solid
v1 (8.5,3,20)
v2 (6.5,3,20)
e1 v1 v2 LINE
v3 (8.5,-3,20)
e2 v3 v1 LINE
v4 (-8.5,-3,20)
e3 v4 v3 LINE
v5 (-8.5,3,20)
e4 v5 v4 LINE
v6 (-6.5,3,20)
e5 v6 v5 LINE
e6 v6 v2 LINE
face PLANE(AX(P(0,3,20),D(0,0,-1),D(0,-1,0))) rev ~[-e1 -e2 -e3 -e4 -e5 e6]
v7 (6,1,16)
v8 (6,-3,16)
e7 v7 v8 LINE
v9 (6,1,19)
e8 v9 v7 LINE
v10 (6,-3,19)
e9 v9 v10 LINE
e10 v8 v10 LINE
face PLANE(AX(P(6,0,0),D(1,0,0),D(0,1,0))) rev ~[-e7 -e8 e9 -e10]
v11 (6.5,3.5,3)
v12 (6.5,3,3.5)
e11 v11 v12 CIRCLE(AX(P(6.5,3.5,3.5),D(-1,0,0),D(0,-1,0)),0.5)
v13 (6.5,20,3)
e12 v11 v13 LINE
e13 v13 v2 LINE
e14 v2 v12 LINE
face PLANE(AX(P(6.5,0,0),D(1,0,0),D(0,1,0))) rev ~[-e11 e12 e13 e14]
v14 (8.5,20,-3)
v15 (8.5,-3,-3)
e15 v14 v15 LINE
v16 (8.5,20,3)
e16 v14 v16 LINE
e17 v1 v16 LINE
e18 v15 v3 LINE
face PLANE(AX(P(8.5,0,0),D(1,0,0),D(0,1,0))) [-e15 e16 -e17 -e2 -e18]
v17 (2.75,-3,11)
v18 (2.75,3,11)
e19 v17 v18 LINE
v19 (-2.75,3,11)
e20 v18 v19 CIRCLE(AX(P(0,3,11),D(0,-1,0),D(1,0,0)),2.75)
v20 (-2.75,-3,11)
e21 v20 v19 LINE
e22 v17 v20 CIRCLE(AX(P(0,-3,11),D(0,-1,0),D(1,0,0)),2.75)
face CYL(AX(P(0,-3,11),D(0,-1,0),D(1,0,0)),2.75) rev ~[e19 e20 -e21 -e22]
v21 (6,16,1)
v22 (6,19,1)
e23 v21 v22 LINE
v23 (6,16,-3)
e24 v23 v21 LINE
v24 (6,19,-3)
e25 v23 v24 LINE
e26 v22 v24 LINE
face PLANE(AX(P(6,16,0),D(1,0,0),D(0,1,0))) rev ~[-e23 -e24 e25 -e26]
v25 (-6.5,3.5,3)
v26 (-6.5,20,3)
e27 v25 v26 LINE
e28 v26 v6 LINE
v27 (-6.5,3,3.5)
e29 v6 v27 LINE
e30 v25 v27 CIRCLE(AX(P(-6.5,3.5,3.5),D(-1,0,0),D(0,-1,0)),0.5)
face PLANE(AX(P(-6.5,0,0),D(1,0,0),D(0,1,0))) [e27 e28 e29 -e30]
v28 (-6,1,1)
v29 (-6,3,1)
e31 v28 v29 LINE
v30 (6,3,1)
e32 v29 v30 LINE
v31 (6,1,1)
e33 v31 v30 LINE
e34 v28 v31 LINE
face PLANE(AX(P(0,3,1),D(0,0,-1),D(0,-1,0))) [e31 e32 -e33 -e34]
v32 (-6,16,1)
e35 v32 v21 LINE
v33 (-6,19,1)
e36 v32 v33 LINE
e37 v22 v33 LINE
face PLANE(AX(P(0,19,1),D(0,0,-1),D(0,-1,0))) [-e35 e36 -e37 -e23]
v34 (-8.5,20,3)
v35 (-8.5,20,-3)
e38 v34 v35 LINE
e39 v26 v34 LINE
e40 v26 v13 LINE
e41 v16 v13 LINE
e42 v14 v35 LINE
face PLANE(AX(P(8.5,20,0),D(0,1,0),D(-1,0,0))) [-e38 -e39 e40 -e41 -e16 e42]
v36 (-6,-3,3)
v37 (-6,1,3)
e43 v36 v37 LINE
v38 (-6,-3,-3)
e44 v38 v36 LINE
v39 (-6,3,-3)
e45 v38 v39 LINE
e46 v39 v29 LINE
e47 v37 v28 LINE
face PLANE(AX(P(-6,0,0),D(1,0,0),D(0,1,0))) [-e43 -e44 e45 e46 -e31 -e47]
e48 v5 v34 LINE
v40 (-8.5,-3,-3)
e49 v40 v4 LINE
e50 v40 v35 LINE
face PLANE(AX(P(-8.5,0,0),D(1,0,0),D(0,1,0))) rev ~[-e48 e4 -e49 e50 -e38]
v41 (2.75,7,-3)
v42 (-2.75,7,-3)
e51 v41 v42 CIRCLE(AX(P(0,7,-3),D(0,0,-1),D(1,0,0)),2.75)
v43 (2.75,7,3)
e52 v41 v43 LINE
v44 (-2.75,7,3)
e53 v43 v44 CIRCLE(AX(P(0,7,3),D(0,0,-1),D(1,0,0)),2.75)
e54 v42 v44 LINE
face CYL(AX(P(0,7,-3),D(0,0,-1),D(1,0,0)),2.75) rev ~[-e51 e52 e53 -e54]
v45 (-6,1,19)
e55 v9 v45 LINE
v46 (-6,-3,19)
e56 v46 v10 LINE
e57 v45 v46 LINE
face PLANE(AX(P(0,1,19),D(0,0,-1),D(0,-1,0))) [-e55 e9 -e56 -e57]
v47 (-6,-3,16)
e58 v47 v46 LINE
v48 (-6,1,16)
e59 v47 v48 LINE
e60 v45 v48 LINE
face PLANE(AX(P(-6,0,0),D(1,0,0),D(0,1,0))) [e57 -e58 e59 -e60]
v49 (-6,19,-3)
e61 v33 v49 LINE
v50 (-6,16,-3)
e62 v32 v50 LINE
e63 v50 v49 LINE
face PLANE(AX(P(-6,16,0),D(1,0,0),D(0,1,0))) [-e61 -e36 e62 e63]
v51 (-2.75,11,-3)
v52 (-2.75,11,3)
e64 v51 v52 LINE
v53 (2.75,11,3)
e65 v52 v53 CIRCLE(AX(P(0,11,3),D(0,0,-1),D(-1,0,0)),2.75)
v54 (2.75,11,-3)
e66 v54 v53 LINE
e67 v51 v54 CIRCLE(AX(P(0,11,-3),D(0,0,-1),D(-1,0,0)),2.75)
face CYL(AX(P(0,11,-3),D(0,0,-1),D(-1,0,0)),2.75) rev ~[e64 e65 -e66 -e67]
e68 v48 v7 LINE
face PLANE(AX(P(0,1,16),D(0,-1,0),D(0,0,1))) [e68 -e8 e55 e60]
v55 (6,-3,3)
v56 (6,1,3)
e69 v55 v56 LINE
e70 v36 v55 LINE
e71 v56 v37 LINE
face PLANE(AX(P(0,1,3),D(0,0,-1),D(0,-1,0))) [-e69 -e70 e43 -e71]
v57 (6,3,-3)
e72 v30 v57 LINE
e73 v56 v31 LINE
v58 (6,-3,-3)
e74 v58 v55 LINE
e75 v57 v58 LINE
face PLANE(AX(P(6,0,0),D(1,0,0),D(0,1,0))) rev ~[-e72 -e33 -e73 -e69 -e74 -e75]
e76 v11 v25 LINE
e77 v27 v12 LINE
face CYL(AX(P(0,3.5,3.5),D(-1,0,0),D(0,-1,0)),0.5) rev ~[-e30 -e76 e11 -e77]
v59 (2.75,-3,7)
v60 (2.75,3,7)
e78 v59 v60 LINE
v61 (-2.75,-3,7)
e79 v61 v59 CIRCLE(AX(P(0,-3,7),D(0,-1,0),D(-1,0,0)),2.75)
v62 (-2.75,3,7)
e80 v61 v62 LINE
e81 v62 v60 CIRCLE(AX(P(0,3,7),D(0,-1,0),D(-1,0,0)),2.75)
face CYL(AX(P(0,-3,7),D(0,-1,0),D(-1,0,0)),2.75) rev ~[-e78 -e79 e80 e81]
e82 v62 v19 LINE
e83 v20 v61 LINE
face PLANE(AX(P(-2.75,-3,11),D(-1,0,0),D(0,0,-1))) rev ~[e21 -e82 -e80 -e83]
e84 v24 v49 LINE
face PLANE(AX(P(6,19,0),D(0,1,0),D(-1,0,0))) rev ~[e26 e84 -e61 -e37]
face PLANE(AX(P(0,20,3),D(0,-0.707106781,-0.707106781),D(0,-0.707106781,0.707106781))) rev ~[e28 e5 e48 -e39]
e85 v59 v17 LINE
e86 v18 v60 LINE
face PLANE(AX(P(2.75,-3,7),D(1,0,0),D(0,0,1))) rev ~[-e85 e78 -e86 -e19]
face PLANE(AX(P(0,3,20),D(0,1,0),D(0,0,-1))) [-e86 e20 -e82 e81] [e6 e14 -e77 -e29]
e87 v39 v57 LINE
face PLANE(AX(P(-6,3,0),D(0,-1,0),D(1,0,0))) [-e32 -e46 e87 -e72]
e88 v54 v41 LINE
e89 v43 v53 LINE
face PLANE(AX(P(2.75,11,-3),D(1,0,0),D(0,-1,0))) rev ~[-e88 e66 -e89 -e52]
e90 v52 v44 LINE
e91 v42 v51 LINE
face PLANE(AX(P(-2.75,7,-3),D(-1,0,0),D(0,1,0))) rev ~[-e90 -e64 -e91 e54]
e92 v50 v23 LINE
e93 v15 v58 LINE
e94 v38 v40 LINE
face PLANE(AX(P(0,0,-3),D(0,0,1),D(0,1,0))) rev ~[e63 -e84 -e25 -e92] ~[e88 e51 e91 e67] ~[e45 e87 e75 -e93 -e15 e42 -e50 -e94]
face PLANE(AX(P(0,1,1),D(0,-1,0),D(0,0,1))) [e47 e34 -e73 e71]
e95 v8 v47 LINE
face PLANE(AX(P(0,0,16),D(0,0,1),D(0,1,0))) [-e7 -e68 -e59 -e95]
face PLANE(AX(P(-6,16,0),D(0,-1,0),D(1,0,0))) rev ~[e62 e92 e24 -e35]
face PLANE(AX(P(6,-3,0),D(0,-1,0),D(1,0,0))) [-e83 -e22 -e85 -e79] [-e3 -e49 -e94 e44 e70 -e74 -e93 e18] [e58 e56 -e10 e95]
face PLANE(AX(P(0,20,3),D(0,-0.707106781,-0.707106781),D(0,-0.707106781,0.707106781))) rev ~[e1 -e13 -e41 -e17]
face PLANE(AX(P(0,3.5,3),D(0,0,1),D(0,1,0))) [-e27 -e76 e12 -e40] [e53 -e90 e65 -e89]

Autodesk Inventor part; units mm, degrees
ref_plane "YZ Plane" through (0, 0, 0) normal (1, 0, 0) x (0, 1, 0)
ref_plane "XZ Plane" through (0, 0, 0) normal (0, 1, 0) x (-1, 0, 0)
ref_plane "XY Plane" through (0, 0, 0) normal (0, 0, 1) x (1, 0, 0)
sketch "Sketch_1" plane through (0, 0, 0) normal (1, 0, 0) x (0, 1, 0)
  line L0 (0, 20) -> (0, 0)
  line L1 (0, 0) -> (20, 0)
  line L2 (20, 0) -> (20, 3)
  line L3 (20, 3) -> (3, 20)
  line L4 (3, 20) -> (0, 20)
  dimension "d35" = 20
  dimension "d36" = 20
  dimension "d37" = 17
  dimension "d38" = 3
extrude "Extrusion1" add sketch "Sketch_1" along normal mid plane 17
sketch "Sketch_2" plane through (0, 0, 0) normal (1, 0, 0) x (0, 1, 0)
  line L0 (3, 20) -> (3, 3.5)
  arc A0 (3, 3.5) -> (3.5, 3) centre (3.5, 3.5) ccw
  line L1 (3.5, 3) -> (20, 3)
  line L2 (20, 3) -> (3, 20)
extrude "Extrusion2" cut sketch "Sketch_2" along normal mid plane 13
sketch "Sketch_3" plane through (0, 0, 0) normal (1, 0, 0) x (0, 1, 0)
  line L0 (0, 3) -> (0, 0)
  line L1 (0, 0) -> (3, 0)
  line L2 (3, 0) -> (3, 1)
  line L3 (3, 1) -> (1, 1)
  line L4 (1, 1) -> (1, 3)
  line L5 (1, 3) -> (0, 3)
extrude "Extrusion3" cut sketch "Sketch_3" along normal mid plane 12
sketch "Sketch_4" plane through (0, 0, 0) normal (1, 0, 0) x (0, 1, 0)
  line L0 (0, 19) -> (0, 16)
  line L1 (0, 16) -> (1, 16)
  line L2 (1, 16) -> (1, 19)
  line L3 (1, 19) -> (0, 19)
extrude "Extrusion4" cut sketch "Sketch_4" along normal mid plane 12
sketch "Sketch_5" plane through (0, 0, 0) normal (1, 0, 0) x (0, 1, 0)
  line L0 (16, 1) -> (16, 0)
  line L1 (16, 0) -> (19, 0)
  line L2 (19, 0) -> (19, 1)
  line L3 (19, 1) -> (16, 1)
extrude "Extrusion5" cut sketch "Sketch_5" along normal mid plane 12
move faces "Move1" translate (0, 0, -3) faces at (-2, 7.3333, 0) (-2, 0, 11.6667)
move faces "Move2" translate (0, -3, 0) faces at (-2, 0, 7.3333)
sketch "Sketch8" plane through (-8.5, -3, 20) normal (0, -1, 0) x (1, 0, 0)
  line L0 (8.5, -9) -> (8.5, -13) construction
  line L1 (5.75, -9) -> (5.75, -13)
  line L2 (11.25, -13) -> (11.25, -9)
  arc A0 (11.25, -9) -> (5.75, -9) centre (8.5, -9) ccw
  arc A1 (5.75, -13) -> (11.25, -13) centre (8.5, -13) ccw
  line L3 (14.5, -23) -> (2.5, -23) projected
  line L4 (17, 0) -> (17, -23) projected
  point P0 (8.5, -20)
  point P1 (8.5, -11)
  dimension "d23" = 2
  dimension "d24" = 5.5
  dimension "d25" = 12
  dimension "d32" = 8.5
extrude "Extrusion8" cut sketch "Sketch8" against normal through all
sketch "Sketch9" plane through (8.5, 20, -3) normal (0, 0, -1) x (-1, 0, 0)
  line L0 (8.5, -9) -> (8.5, -13) construction
  line L1 (5.75, -9) -> (5.75, -13)
  line L2 (11.25, -13) -> (11.25, -9)
  arc A0 (11.25, -9) -> (5.75, -9) centre (8.5, -9) ccw
  arc A1 (5.75, -13) -> (11.25, -13) centre (8.5, -13) ccw
  line L3 (17, -23) -> (14.5, -23) projected
  line L4 (0, -23) -> (0, 0) projected
  point P0 (8.5, -20)
  point P1 (8.5, -11)
  dimension "d28" = 2
  dimension "d29" = 5.5
  dimension "d30" = 12
  dimension "d31" = 8.5
extrude "Extrusion9" cut sketch "Sketch9" against normal through all
properties part number "14056_m"
